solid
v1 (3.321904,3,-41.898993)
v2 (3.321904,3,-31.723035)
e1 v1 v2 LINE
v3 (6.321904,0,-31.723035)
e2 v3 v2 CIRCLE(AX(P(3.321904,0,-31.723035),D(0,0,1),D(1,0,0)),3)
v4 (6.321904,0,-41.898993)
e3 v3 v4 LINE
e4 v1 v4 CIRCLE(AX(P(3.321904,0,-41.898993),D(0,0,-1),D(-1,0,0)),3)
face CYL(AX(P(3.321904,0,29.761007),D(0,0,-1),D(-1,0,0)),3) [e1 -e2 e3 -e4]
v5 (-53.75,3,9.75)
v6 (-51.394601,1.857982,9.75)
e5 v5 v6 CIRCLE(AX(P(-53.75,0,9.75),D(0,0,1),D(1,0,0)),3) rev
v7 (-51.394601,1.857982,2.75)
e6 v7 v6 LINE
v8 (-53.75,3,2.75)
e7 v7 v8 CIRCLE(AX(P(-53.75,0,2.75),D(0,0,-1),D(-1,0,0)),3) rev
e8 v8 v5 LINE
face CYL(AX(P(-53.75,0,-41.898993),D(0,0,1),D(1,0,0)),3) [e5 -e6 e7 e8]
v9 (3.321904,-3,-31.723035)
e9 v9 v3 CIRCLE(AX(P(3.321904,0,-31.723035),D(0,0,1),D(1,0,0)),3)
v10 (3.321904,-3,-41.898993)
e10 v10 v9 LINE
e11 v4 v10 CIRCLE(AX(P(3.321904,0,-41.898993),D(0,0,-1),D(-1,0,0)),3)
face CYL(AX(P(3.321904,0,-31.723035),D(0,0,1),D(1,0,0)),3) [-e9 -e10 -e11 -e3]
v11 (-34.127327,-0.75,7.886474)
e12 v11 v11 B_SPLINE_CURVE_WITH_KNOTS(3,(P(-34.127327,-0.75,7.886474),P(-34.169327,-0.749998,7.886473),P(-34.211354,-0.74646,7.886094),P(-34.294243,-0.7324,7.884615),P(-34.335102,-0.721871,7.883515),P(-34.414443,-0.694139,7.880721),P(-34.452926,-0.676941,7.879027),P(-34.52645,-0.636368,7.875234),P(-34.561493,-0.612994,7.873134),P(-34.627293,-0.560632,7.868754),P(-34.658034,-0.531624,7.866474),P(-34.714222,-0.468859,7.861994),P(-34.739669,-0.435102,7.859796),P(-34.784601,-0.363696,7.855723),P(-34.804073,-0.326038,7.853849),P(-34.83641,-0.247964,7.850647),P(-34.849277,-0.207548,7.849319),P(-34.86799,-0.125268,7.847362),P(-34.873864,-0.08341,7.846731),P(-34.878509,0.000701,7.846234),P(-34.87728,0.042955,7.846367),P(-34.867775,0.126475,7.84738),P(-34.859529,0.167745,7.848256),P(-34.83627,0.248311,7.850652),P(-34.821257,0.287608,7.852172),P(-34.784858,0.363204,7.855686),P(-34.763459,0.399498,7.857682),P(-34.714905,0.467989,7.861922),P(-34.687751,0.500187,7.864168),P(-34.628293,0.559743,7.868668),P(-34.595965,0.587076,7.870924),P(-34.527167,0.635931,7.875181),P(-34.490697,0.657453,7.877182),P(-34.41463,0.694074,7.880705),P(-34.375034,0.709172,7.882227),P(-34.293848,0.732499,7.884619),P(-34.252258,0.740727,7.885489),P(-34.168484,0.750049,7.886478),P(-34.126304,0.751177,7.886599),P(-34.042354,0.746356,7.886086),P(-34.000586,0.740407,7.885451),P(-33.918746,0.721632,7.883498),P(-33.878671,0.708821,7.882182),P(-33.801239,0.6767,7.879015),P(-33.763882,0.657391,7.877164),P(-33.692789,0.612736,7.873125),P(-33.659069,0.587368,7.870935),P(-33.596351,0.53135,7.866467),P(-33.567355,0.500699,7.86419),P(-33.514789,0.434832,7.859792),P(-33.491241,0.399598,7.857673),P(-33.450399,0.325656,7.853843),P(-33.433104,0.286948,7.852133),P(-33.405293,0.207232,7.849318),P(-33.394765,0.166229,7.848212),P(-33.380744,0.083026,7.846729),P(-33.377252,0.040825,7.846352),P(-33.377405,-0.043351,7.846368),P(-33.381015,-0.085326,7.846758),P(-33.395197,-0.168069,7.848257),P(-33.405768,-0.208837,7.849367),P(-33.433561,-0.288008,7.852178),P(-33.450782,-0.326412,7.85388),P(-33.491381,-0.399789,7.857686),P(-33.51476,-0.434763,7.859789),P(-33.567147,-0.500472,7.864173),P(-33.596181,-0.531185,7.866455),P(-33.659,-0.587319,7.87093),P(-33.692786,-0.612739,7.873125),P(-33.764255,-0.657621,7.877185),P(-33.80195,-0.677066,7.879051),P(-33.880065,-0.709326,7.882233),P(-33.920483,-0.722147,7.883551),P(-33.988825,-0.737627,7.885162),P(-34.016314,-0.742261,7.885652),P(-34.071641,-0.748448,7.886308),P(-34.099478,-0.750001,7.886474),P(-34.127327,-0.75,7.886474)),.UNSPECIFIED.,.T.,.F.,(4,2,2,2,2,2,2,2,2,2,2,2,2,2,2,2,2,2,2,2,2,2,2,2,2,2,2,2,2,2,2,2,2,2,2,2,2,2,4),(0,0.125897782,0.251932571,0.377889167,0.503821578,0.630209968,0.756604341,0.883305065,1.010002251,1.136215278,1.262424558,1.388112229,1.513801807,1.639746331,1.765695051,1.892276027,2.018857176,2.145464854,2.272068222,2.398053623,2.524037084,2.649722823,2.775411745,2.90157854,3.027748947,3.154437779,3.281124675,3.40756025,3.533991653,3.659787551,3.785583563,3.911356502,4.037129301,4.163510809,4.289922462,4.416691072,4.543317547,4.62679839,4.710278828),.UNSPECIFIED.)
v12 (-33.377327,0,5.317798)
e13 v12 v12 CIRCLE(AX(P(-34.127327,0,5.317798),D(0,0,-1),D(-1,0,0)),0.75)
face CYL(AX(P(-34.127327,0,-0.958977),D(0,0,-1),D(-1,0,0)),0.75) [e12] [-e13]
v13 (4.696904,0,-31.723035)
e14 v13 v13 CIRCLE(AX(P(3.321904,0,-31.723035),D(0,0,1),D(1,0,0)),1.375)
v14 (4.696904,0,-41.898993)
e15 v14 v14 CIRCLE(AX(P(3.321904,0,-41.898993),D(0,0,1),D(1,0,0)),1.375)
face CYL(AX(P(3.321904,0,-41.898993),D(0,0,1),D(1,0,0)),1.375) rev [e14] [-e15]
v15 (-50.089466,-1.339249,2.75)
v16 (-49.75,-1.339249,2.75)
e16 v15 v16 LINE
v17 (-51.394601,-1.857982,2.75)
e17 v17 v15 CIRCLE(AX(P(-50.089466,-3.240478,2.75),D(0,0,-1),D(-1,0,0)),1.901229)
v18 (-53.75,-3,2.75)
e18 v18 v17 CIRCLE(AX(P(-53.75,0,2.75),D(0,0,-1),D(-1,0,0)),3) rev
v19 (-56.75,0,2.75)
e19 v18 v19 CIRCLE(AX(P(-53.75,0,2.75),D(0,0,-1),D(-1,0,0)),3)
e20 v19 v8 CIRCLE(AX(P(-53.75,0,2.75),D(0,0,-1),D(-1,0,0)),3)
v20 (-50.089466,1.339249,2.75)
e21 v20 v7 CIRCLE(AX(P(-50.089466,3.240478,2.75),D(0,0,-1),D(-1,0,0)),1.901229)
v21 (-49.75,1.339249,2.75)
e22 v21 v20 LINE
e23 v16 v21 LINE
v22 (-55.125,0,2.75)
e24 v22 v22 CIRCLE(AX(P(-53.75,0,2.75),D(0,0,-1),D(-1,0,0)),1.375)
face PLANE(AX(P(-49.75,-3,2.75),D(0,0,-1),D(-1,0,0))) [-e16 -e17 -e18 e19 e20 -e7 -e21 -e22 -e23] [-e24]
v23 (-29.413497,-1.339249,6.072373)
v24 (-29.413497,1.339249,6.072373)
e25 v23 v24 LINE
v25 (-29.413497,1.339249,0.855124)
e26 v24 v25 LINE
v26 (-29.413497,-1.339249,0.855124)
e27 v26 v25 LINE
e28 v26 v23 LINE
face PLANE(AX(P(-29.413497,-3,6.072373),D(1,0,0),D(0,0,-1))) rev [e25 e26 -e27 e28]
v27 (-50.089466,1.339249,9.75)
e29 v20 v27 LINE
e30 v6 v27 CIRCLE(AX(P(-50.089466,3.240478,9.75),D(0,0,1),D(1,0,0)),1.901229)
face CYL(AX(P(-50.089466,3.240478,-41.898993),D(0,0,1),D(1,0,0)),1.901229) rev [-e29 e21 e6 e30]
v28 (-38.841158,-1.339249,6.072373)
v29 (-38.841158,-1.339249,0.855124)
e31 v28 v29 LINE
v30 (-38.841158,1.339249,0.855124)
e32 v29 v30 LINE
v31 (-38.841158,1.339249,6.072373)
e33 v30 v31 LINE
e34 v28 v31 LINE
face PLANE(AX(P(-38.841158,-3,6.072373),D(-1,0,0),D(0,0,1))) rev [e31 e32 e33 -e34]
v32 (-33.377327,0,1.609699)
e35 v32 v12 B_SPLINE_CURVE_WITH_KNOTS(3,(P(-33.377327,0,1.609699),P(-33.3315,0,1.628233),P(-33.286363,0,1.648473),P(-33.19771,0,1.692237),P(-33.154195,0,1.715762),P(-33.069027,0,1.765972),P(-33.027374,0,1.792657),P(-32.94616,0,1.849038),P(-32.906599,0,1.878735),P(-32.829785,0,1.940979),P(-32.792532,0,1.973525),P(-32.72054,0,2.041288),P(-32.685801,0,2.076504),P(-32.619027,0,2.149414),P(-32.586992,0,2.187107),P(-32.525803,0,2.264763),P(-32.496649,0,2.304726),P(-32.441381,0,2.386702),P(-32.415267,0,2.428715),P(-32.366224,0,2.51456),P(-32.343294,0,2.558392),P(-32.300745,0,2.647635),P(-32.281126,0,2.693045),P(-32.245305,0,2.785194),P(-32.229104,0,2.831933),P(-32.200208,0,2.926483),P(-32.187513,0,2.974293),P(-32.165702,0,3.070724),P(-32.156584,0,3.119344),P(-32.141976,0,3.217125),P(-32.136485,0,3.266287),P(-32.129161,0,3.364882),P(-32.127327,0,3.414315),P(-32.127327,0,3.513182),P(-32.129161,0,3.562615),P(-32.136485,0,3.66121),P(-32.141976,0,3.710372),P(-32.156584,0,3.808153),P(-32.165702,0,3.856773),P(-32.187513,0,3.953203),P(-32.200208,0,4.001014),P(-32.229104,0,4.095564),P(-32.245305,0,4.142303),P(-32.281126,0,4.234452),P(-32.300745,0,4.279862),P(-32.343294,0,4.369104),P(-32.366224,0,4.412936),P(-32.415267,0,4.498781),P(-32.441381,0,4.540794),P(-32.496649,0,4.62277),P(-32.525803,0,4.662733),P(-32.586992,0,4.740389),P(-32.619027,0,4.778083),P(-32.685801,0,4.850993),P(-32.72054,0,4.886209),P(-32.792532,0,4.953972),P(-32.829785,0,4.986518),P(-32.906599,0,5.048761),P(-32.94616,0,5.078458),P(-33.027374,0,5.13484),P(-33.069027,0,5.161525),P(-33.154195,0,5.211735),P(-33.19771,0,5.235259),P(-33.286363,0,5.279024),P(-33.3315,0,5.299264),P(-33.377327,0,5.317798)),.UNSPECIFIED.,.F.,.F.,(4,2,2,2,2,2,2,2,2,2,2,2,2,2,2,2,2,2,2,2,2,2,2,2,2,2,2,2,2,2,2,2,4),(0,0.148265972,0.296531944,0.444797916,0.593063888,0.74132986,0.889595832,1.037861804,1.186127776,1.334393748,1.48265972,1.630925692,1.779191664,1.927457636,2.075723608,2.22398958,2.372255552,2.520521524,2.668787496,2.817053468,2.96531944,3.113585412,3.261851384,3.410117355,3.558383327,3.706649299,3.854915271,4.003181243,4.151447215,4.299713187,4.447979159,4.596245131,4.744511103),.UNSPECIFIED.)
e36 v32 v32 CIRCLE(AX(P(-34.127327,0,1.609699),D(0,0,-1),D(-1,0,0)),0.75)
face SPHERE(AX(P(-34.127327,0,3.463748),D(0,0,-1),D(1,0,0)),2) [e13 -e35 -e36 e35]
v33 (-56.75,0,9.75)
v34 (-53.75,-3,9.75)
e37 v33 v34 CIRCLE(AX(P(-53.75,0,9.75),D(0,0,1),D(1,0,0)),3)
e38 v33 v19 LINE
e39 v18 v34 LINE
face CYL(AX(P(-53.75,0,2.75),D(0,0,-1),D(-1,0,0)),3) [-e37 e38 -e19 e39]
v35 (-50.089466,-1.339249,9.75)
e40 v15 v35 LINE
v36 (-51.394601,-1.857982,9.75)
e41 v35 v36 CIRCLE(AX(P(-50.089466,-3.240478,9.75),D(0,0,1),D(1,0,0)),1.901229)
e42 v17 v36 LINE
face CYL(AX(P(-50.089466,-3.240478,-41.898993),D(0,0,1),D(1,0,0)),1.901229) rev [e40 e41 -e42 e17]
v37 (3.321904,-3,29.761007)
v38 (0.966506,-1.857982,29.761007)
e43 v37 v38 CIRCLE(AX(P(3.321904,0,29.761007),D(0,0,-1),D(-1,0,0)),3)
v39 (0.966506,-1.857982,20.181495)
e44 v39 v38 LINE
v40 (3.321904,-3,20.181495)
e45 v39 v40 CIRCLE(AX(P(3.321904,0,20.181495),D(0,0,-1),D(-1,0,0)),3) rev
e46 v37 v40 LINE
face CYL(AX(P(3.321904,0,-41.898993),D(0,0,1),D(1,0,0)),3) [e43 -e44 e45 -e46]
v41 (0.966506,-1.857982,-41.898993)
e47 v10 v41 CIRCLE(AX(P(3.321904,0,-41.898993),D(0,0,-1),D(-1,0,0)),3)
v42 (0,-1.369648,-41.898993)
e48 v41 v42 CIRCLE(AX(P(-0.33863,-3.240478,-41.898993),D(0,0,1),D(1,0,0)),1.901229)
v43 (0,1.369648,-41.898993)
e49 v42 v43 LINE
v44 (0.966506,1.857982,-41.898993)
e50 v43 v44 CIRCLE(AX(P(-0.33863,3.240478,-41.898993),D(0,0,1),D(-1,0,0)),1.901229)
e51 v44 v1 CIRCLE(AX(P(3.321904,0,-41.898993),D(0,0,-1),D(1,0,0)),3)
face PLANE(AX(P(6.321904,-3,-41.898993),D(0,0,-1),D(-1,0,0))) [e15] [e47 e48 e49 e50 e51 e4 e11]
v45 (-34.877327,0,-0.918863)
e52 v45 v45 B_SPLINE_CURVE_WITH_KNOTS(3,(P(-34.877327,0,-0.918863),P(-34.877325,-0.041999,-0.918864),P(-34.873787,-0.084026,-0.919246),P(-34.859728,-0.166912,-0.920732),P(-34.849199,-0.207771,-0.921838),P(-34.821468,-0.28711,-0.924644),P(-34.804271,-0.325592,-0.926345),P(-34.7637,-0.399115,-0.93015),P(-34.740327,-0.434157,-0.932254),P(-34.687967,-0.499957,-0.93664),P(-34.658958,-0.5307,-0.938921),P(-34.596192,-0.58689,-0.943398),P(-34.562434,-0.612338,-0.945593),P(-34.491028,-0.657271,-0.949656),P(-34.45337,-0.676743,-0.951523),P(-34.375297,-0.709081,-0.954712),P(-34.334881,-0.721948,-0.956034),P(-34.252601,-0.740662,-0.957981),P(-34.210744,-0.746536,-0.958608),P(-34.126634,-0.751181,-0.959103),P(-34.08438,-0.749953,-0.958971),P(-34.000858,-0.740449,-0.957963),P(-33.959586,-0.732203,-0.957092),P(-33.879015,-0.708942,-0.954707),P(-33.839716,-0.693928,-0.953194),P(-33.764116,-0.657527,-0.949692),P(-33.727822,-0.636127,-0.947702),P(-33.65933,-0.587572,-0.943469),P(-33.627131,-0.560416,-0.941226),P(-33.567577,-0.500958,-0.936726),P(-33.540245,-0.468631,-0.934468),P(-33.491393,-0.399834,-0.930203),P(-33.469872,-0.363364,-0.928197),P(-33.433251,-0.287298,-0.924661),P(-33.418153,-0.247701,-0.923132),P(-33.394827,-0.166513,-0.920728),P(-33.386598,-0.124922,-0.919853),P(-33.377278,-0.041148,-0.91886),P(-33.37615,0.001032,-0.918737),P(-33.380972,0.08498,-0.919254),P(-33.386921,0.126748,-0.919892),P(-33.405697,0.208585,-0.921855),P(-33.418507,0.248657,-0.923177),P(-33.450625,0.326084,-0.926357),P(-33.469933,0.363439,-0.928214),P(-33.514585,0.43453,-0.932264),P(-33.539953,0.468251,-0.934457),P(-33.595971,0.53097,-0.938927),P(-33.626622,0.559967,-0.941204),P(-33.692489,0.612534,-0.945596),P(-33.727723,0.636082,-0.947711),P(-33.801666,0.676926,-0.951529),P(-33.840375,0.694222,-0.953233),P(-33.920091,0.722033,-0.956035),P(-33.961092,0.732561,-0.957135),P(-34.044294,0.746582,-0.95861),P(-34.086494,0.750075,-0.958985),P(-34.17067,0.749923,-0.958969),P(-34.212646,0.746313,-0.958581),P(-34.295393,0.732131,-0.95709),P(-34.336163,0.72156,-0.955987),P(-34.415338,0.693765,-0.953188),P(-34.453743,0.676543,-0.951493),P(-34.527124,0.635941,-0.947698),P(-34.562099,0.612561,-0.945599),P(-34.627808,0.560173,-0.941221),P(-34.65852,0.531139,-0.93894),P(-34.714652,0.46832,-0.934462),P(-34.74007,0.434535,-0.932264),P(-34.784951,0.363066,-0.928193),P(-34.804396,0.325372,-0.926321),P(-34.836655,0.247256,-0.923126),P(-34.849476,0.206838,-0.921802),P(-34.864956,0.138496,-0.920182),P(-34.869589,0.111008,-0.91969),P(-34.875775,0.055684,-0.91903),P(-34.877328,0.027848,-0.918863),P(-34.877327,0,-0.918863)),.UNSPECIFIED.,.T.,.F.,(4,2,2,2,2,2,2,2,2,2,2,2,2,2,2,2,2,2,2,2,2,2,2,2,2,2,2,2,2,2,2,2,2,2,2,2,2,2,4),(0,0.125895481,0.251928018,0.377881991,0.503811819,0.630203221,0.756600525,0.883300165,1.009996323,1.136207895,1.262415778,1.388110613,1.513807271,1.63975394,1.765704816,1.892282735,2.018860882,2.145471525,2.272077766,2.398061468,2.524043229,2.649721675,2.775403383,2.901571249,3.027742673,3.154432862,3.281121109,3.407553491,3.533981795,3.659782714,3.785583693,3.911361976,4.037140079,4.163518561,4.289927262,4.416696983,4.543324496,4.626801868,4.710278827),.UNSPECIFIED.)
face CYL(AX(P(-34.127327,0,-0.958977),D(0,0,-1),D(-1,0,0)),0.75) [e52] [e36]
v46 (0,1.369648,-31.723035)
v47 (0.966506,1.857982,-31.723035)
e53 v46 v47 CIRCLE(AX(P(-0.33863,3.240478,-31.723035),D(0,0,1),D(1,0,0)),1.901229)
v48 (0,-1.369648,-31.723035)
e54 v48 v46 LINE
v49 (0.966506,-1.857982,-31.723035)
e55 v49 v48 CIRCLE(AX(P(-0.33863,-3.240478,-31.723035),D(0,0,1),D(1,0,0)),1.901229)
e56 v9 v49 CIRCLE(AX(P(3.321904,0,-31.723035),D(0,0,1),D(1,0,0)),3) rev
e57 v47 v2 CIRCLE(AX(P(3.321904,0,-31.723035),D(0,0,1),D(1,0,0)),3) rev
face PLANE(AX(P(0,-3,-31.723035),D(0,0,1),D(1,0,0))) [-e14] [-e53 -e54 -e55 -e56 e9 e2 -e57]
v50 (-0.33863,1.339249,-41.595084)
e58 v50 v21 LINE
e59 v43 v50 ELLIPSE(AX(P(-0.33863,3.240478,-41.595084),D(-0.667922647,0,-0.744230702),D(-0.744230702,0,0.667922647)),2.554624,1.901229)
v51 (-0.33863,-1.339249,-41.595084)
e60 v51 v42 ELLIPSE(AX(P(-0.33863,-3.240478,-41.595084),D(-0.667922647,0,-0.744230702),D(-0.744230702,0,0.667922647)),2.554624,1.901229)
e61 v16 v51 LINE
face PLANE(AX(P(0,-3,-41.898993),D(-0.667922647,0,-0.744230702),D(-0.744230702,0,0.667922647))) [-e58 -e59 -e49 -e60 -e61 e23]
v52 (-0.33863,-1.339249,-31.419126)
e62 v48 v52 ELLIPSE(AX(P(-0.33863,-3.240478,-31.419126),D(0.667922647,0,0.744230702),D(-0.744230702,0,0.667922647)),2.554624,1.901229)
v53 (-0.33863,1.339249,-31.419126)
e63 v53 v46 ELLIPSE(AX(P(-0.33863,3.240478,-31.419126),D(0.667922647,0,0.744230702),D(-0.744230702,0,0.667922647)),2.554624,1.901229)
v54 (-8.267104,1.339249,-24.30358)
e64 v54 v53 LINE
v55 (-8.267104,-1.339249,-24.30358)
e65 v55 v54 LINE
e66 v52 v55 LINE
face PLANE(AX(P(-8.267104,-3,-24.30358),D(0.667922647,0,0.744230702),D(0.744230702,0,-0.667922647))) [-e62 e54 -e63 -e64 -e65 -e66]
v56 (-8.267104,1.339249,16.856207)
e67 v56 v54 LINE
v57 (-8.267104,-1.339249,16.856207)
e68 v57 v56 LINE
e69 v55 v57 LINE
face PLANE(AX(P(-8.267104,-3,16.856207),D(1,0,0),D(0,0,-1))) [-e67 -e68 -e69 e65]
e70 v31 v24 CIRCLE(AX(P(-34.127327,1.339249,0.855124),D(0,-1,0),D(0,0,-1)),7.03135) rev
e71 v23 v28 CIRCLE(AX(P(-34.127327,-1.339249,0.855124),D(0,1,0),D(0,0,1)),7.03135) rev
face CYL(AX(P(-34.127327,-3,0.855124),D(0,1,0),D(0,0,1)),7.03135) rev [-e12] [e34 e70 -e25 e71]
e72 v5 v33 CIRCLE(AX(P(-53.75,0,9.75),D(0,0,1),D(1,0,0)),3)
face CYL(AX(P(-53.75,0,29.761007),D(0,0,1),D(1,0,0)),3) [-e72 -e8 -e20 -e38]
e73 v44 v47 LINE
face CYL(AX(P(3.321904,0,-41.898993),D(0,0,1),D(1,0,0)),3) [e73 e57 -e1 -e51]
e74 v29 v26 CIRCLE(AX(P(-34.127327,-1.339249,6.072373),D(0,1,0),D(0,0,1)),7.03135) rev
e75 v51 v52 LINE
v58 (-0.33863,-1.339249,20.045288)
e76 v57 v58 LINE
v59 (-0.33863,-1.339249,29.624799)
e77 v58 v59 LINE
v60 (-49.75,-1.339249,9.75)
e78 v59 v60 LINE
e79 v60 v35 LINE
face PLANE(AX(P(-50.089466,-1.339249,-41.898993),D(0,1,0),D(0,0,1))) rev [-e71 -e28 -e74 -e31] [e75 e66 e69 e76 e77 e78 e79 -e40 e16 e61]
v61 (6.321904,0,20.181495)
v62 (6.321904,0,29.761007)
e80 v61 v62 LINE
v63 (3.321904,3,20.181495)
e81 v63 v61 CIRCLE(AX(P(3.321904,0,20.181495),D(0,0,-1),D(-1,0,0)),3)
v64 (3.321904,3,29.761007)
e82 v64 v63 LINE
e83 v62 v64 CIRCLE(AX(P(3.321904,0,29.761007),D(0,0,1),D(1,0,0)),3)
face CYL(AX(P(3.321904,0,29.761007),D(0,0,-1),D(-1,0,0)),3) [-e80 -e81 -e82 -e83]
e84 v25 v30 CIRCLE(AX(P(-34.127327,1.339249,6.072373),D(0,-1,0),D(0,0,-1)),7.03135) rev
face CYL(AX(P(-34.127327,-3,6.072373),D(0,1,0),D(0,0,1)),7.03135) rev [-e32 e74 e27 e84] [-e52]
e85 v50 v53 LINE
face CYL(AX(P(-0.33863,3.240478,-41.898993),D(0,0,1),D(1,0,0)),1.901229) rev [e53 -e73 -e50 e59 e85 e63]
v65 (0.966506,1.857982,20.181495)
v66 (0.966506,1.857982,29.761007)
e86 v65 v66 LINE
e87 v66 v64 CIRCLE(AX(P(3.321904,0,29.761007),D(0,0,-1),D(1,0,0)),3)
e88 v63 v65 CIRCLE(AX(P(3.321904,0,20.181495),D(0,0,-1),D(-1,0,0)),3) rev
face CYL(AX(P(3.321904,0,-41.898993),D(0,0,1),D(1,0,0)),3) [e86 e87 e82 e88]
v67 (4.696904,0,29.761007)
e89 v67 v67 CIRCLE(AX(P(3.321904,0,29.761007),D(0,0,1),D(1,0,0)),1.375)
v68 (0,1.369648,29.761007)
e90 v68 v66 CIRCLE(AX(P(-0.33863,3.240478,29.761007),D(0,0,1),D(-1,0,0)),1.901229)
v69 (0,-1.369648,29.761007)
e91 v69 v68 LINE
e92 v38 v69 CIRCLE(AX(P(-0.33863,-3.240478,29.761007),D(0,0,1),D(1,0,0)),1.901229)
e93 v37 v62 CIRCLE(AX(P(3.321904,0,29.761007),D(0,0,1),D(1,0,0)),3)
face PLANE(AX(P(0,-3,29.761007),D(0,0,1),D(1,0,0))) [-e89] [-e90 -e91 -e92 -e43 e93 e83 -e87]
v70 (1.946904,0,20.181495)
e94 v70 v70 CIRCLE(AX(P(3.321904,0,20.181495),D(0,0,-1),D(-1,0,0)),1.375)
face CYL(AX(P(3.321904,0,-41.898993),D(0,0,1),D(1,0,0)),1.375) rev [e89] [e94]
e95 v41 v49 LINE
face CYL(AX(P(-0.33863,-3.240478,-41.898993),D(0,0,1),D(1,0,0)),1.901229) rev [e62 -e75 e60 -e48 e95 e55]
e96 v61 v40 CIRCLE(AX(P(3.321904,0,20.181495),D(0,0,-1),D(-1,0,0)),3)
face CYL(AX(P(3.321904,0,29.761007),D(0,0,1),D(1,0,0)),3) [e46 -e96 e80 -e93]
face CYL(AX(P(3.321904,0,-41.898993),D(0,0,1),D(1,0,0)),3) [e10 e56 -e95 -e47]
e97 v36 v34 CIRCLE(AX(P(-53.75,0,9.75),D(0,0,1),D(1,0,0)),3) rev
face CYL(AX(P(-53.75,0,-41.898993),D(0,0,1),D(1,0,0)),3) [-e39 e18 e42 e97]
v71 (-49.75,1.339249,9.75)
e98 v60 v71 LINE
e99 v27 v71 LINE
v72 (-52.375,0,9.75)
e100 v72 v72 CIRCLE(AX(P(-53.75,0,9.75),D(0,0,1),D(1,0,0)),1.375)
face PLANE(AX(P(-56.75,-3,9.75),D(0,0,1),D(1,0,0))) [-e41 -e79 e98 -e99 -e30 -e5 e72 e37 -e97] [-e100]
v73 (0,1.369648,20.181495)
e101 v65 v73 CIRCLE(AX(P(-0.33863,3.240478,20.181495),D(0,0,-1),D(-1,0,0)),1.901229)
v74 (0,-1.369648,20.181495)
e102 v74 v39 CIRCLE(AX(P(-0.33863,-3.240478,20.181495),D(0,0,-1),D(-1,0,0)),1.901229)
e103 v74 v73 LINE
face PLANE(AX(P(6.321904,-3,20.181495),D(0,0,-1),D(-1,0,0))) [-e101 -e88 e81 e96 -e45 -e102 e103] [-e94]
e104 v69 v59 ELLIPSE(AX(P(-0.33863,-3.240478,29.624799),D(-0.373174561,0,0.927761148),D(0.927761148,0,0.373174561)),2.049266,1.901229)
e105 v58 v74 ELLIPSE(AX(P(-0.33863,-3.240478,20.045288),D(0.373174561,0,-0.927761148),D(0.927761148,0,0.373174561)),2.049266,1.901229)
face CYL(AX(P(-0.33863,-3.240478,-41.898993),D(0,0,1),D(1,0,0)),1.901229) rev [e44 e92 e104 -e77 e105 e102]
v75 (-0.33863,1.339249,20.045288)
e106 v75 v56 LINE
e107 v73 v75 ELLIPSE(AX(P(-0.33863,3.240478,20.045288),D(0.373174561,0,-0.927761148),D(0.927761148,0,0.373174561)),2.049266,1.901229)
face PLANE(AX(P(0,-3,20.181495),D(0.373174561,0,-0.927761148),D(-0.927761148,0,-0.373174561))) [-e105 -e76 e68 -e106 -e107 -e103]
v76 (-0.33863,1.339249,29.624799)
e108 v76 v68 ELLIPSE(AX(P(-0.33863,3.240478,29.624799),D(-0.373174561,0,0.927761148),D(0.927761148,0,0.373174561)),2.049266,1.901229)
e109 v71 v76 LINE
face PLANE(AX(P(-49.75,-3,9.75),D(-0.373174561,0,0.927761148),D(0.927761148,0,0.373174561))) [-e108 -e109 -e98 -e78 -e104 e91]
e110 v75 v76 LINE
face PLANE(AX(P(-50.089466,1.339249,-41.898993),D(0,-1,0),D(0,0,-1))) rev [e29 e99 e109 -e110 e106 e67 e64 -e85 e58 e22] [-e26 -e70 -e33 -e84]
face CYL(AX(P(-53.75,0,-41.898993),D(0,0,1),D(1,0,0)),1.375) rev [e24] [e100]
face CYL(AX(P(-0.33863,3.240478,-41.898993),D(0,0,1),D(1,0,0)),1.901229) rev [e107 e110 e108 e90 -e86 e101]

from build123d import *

# Parameters (mm, degrees)
BOSS_EXTRUDE1_DEPTH      = 3
BOSS_EXTRUDE1_DEPTH_BACK = 3
CUT_EXTRUDE1_DEPTH       = 77.793105304
CUT_EXTRUDE1_DEPTH_BACK  = 77.793105304
SKETCH2_R                = 1.375
FILLET2_R                = 3


with BuildPart() as part:
    # Sketch1 → Boss-Extrude1 (new, two sides: drawn at the far end of the back side and taken through both)
    with BuildSketch(Plane(origin=(0, 0, 0), x_dir=(1, 0, 0), z_dir=(0, 1, 0)).offset(-BOSS_EXTRUDE1_DEPTH_BACK)):
        Polygon((0, 41.898993428), (-49.75, -2.75), (-56.75, -2.75), (-56.75, -9.75), (-49.75, -9.75), (0, -29.761006572), (6.321904272, -29.761006572), (6.321904272, -20.181495095), (0, -20.181495095), (-8.267104031, -16.856207194), (-8.267104031, 24.303580089), (0, 31.723034833), (6.321904272, 31.723034833), (6.321904272, 41.898993428), align=None)
        with BuildLine():
            Line((-38.84115752, -6.072372844), (-38.84115752, -0.855123784))
            ThreePointArc((-38.84115752, -0.855123784), (-34.127327229, 0.958977223), (-29.413496938, -0.855123784))
            Line((-29.413496938, -0.855123784), (-29.413496938, -6.072372844))
            ThreePointArc((-29.413496938, -6.072372844), (-34.127327229, -7.886473851), (-38.84115752, -6.072372844))
        make_face(mode=Mode.SUBTRACT)
    extrude(amount=BOSS_EXTRUDE1_DEPTH + BOSS_EXTRUDE1_DEPTH_BACK)

    # Sketch2 → Cut-Extrude1 (cut, two sides: drawn at the far end of the back side and taken through both)
    with BuildSketch(Plane.XY.offset(9.75).offset(-CUT_EXTRUDE1_DEPTH_BACK)):
        with Locations((-53.75, 0)):
            Circle(SKETCH2_R)
        with Locations((3.321904272, 0)):
            Circle(SKETCH2_R)
        with BuildLine():
            Line((-53.75, -3), (-53.75, -4.40506942))
            Line((-53.75, -4.40506942), (3.321904272, -4.40506942))
            Line((3.321904272, -4.40506942), (3.321904272, -3))
            ThreePointArc((3.321904272, -3), (2.013077646, -2.699439361), (0.966505531, -1.857981908))
            ThreePointArc((0.966505531, -1.857981908), (0.3635922, -1.473684928), (-0.338629648, -1.339248585))
            Line((-0.338629648, -1.339248585), (-50.08946608, -1.339248585))
            ThreePointArc((-50.08946608, -1.339248585), (-50.791687928, -1.473684928), (-51.394601259, -1.857981908))
            ThreePointArc((-51.394601259, -1.857981908), (-52.441173374, -2.699439361), (-53.75, -3))
        make_face()
        with BuildLine():
            Line((3.321904272, 3), (3.321904272, 4.40506942))
            Line((3.321904272, 4.40506942), (-53.75, 4.40506942))
            Line((-53.75, 4.40506942), (-53.75, 3))
            ThreePointArc((-53.75, 3), (-52.441173374, 2.699439361), (-51.394601259, 1.857981908))
            ThreePointArc((-51.394601259, 1.857981908), (-50.791687928, 1.473684928), (-50.08946608, 1.339248585))
            Line((-50.08946608, 1.339248585), (-0.338629648, 1.339248585))
            ThreePointArc((-0.338629648, 1.339248585), (0.3635922, 1.473684928), (0.966505531, 1.857981908))
            ThreePointArc((0.966505531, 1.857981908), (2.013077646, 2.699439361), (3.321904272, 3))
        make_face()
    extrude(amount=CUT_EXTRUDE1_DEPTH + CUT_EXTRUDE1_DEPTH_BACK, mode=Mode.SUBTRACT)

    # Fillet2
    fillet2_edges = [part.edges().sort_by_distance(p)[0] for p in [
        (6.321904272, 3, -36.811014131),
        (6.321904272, -3, -36.811014131),
        (6.321904272, -3, 24.971250833),
        (6.321904272, 3, 24.971250833),
        (-56.75, -3, 6.25),
        (-56.75, 3, 6.25),
    ]]
    fillet(fillet2_edges, radius=FILLET2_R - 0.0001)  # a hair under: the kernel refuses the full size

    # Sketch3 → Revolve1 (revolve)
    with BuildSketch(Plane(origin=(0, 0, 0), x_dir=(1, 0, 0), z_dir=(0, 1, 0)), mode=Mode.PRIVATE) as revolve1_sk:
        with BuildLine():
            Line((-34.127327229, 0.958977223), (-33.377327229, 0.958977223))
            Line((-33.377327229, 0.958977223), (-33.377327229, -1.609698692))
            ThreePointArc((-33.377327229, -1.609698692), (-32.127327229, -3.463748314), (-33.377327229, -5.317797935))
            Line((-33.377327229, -5.317797935), (-33.377327229, -7.886473851))
            Line((-33.377327229, -7.886473851), (-34.127327229, -7.886473851))
            Line((-34.127327229, -7.886473851), (-34.127327229, 0.958977223))
        make_face()
    revolve(revolve1_sk.sketch.rotate(Axis((-34.127327229, 0, -0.958977223), (0, 0, 1)), 270), axis=Axis((-34.127327229, 0, -0.958977223), (0, 0, 1)))


solid = part.part
